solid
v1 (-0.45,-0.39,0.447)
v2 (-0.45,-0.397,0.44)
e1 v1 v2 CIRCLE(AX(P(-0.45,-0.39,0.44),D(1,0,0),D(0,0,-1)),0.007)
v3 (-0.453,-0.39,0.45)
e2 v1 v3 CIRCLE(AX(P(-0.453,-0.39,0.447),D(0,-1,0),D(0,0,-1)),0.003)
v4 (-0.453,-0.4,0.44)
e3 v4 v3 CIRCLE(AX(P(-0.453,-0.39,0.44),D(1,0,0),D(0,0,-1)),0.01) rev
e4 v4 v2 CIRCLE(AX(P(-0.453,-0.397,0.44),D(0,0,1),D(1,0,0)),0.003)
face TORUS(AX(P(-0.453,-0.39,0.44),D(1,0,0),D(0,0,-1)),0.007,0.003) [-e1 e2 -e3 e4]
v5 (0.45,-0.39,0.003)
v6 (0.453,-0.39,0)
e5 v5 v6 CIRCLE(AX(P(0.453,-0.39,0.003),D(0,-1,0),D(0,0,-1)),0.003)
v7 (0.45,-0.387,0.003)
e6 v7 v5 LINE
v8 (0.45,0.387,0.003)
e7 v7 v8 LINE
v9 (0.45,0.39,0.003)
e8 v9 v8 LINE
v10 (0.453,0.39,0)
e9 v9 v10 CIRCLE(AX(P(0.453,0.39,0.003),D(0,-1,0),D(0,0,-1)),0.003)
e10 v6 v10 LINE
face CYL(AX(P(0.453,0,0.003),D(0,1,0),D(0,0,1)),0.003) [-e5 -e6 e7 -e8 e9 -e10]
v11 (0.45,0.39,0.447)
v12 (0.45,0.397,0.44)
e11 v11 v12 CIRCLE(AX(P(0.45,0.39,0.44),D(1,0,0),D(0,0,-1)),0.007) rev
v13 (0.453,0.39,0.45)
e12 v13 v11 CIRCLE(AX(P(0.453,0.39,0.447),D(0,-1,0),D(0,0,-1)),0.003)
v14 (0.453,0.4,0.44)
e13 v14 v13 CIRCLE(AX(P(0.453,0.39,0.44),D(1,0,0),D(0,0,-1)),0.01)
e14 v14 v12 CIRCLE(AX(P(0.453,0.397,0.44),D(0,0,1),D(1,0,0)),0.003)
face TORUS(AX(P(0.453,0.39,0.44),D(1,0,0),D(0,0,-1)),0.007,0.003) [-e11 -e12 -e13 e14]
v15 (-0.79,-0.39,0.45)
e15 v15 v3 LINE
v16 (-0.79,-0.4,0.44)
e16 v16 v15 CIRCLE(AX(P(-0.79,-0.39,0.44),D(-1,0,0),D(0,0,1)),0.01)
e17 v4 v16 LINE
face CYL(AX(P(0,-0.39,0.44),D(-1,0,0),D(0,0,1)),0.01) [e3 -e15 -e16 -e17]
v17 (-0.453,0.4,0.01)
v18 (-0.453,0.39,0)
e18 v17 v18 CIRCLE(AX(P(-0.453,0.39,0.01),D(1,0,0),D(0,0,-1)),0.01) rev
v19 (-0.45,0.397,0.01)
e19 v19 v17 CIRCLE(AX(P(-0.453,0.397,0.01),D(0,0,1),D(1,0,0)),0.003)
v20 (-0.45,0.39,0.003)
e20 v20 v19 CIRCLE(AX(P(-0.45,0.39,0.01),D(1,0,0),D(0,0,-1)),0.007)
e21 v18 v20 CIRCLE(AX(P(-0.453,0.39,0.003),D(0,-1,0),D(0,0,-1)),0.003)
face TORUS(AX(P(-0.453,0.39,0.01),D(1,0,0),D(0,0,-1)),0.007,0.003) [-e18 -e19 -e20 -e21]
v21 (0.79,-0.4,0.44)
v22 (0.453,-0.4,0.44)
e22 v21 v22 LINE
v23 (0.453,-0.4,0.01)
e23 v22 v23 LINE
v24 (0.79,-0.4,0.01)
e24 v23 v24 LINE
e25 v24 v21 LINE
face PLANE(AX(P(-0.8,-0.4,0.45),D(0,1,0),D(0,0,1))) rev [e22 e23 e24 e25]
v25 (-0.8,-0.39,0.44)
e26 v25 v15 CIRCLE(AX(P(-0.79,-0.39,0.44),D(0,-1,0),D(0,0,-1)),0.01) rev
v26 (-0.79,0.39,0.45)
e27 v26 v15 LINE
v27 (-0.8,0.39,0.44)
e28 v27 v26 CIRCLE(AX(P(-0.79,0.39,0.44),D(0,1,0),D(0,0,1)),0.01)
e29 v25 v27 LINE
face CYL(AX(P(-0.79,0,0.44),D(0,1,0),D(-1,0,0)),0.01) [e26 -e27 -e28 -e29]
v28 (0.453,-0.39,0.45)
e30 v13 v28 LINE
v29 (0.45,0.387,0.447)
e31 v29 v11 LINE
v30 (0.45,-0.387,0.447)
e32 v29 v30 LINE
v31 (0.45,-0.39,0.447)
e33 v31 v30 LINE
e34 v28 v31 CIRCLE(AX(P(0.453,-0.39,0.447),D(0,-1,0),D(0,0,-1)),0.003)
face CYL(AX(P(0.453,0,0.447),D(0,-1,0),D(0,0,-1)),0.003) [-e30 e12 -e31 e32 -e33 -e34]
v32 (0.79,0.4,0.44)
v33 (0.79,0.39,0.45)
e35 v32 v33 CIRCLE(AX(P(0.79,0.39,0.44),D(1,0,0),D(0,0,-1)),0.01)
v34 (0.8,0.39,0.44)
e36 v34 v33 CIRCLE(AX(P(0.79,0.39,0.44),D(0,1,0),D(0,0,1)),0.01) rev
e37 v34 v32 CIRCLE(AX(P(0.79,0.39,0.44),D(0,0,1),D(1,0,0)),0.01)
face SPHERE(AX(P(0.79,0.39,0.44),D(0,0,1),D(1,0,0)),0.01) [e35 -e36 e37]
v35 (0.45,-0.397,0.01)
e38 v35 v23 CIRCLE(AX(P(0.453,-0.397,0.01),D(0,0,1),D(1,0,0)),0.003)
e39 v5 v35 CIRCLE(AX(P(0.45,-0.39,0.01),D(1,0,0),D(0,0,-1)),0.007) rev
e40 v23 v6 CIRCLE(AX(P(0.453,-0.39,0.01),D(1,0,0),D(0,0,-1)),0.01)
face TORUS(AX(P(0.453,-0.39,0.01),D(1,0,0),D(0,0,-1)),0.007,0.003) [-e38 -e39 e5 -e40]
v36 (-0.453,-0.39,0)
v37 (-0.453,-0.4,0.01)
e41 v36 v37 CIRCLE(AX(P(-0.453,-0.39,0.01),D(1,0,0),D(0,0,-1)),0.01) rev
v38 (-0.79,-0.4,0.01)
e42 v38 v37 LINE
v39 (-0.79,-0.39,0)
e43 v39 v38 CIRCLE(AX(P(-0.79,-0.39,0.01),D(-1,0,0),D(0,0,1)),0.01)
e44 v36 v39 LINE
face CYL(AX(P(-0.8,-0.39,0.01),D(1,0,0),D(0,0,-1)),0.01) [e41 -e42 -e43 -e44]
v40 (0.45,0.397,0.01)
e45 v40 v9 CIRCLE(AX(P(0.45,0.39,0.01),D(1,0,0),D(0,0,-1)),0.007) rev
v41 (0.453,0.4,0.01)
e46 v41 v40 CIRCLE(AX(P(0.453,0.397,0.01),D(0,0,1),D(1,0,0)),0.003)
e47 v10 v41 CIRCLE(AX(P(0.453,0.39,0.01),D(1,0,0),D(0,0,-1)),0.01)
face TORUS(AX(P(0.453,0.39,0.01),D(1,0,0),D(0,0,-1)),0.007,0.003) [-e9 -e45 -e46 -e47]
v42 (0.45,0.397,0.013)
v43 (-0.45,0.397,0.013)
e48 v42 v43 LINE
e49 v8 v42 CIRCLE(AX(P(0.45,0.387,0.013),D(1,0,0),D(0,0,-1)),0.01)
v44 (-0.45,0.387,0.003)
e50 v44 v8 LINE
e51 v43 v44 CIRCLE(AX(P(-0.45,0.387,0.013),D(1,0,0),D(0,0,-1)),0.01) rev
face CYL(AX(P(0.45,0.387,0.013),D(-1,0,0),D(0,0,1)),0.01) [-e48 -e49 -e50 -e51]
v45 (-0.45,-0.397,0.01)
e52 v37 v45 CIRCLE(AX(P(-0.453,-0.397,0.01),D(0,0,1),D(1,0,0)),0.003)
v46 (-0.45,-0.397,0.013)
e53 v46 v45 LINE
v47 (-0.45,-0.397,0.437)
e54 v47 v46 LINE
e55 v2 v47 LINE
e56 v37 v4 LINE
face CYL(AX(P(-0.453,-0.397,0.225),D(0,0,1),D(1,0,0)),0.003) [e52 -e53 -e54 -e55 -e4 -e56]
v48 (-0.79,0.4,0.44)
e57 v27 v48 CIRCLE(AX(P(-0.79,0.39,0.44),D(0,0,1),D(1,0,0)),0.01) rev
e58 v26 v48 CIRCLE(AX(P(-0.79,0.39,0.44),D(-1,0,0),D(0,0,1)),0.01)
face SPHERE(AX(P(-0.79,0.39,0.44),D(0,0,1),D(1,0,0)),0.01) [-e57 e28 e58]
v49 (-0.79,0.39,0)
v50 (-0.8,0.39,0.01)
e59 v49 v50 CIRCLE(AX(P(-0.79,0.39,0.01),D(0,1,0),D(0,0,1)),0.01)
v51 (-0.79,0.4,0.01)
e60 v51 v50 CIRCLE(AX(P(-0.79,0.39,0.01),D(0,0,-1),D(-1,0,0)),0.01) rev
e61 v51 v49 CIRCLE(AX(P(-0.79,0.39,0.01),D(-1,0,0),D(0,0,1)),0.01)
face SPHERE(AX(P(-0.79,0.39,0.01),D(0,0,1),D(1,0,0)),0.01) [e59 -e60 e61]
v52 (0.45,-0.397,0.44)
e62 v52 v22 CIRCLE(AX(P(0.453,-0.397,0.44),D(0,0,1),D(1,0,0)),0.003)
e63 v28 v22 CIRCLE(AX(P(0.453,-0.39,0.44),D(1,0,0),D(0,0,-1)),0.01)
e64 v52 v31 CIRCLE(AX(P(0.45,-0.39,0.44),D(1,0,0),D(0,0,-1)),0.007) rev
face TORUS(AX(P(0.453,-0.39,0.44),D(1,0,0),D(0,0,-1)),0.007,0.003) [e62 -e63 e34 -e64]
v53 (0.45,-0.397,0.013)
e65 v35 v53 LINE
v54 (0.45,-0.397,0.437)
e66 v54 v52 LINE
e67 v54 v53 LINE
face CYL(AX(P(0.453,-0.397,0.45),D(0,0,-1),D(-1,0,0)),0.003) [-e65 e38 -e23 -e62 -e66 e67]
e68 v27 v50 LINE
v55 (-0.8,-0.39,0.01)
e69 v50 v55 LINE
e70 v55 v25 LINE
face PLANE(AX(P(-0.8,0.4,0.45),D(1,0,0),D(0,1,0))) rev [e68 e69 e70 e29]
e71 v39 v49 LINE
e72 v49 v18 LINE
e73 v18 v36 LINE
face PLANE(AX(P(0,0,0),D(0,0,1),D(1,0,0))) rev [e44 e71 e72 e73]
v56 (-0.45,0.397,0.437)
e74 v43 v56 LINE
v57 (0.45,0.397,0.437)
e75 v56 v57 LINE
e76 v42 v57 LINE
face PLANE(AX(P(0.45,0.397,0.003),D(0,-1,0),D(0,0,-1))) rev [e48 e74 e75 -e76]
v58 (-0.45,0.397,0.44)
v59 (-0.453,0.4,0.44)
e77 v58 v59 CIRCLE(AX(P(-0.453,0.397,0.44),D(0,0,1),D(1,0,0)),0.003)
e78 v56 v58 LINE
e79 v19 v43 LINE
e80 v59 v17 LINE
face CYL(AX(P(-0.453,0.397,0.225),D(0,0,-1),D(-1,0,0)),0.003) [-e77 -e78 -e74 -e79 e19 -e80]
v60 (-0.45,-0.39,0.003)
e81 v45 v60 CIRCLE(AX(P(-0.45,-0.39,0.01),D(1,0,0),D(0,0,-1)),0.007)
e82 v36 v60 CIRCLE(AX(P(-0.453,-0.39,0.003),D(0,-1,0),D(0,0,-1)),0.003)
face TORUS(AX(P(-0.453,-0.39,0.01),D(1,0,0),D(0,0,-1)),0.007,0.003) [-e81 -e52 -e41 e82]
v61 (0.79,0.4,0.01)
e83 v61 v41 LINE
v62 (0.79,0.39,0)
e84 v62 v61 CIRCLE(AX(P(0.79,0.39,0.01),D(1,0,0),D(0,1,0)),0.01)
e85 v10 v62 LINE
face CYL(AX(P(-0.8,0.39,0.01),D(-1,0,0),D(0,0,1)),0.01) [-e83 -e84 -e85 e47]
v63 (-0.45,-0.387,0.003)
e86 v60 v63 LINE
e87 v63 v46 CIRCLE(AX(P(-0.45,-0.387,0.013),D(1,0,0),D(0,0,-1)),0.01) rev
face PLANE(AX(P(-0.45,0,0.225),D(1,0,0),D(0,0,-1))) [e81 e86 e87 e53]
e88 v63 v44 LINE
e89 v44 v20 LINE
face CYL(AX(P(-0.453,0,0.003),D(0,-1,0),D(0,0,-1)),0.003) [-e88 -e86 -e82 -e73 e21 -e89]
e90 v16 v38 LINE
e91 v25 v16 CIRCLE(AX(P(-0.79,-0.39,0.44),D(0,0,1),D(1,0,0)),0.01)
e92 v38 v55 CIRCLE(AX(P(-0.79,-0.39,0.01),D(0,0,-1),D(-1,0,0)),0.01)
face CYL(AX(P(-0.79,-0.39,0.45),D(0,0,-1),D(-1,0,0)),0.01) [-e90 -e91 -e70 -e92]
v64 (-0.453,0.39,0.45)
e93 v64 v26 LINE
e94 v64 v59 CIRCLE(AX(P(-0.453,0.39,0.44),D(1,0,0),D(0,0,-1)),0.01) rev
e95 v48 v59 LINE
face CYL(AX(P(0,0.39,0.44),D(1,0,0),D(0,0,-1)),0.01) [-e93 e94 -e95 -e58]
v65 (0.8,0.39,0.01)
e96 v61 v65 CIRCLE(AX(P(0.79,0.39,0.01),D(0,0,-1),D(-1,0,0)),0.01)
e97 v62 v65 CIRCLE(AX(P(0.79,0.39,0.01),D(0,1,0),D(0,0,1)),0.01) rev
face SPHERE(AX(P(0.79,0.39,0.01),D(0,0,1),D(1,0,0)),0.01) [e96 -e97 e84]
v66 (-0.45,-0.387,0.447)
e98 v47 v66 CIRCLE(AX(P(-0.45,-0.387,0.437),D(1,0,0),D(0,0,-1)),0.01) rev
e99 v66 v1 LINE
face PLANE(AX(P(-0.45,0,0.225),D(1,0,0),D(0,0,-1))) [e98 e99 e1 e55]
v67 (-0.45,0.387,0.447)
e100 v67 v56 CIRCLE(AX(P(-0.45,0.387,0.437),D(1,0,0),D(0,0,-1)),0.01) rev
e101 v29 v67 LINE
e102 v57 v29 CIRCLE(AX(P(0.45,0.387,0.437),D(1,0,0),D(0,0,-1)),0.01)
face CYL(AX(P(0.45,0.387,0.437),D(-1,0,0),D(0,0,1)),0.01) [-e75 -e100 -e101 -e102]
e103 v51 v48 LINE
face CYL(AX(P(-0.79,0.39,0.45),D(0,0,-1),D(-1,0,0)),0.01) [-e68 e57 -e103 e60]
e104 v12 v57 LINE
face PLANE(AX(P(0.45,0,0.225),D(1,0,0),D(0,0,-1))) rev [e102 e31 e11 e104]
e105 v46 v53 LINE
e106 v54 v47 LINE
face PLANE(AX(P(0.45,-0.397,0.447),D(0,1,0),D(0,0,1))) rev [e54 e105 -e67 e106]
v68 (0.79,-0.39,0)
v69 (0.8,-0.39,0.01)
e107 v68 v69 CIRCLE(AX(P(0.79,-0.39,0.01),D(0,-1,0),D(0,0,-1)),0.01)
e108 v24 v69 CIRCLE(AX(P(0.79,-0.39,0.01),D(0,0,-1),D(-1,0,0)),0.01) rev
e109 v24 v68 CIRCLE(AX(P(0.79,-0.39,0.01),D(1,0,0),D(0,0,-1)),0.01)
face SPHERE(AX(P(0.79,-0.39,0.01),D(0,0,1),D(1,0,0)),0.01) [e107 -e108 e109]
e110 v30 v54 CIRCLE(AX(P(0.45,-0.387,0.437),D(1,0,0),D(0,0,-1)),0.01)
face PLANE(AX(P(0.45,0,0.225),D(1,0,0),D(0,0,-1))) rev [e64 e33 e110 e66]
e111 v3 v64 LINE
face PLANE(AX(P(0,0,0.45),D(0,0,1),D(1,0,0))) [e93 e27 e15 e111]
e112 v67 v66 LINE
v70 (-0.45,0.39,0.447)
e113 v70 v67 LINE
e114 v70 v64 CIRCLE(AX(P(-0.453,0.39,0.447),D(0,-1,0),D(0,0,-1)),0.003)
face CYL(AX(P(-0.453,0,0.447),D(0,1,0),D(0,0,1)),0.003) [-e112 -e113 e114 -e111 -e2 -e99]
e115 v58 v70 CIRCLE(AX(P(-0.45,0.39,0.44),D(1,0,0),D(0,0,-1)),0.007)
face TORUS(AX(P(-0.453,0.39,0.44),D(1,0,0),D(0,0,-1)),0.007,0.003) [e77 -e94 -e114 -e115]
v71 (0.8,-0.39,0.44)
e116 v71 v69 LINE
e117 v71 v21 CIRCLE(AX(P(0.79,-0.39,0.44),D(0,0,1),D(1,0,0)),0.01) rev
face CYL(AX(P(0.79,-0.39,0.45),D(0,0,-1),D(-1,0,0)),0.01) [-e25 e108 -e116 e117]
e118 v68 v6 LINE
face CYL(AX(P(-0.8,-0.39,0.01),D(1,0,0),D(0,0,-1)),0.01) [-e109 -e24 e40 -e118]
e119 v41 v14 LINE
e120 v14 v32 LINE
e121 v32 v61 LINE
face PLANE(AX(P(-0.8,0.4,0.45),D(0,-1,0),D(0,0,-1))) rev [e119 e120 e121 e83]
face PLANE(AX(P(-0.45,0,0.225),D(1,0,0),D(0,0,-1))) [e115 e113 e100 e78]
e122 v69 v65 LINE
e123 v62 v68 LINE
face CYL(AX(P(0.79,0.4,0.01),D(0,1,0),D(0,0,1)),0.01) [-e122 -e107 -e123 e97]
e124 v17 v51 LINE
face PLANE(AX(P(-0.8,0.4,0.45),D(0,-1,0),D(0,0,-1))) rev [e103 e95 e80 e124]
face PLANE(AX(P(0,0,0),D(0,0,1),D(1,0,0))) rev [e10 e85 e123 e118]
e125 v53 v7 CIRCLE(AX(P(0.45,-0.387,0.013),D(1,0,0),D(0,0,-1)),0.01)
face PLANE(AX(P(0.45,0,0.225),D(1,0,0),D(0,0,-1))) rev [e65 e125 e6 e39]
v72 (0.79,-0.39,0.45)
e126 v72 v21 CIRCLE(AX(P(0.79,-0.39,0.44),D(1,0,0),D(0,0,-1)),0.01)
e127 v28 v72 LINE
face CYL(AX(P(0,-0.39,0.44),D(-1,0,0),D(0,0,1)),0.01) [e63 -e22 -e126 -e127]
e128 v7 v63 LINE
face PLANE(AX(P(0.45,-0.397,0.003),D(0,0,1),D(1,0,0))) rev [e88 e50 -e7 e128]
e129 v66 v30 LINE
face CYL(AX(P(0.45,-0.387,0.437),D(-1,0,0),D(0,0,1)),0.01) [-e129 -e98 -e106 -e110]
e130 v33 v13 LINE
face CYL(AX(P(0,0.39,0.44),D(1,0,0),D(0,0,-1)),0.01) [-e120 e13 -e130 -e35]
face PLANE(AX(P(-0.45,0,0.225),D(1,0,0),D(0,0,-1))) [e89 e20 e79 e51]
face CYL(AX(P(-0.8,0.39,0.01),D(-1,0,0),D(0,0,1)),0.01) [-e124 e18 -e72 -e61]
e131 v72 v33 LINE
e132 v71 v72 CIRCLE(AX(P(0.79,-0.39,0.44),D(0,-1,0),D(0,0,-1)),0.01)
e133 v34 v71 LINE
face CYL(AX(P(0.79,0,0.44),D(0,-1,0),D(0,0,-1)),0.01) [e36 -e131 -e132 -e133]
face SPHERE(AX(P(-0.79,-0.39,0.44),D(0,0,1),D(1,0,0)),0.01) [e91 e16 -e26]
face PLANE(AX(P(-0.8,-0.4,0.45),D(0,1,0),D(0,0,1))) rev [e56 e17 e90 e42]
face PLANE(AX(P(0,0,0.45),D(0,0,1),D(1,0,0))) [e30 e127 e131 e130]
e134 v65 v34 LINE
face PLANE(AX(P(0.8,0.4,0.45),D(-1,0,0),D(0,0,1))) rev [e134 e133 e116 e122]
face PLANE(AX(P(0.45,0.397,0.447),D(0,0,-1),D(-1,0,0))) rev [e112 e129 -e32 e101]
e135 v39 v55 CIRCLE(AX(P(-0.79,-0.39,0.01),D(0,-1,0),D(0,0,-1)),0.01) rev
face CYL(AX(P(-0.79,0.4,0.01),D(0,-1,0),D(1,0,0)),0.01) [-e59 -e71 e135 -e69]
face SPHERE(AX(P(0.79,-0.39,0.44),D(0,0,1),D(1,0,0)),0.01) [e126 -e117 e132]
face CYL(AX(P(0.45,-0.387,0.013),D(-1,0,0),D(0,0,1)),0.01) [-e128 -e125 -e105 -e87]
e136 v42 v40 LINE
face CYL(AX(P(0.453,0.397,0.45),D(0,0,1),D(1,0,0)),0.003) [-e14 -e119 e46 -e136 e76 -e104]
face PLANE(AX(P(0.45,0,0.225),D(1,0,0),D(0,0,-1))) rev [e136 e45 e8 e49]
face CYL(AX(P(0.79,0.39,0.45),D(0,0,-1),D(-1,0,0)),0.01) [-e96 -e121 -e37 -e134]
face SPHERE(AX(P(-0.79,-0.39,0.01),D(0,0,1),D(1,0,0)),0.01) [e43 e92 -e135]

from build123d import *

# Parameters (mm, degrees)
SKETCH1_W                           = 1.6
SKETCH1_H                           = 0.8
ALL_BODY_DEPTH                      = 0.45
CUT_OUT_THE_BODY_FOR_PIN_DEPTH      = 0.45
CUT_OUT_THE_BODY_FOR_PIN_DEPTH_BACK = 0.45
SKETCH2_OUTSIDE_W                   = 2.818
SKETCH2_OUTSIDE_H                   = 3.168
SKETCH2_OUTSIDE_W_2                 = 0.444
SKETCH2_OUTSIDE_H_2                 = 0.794
BODY_FILLET_R                       = 0.01
PIN_FILLET_A_R                      = 0.01
PIN_FILLET_B_R                      = 0.003


with BuildPart() as part:
    # Sketch1 → All body (new body)
    with BuildSketch(Plane.XY):
        Rectangle(SKETCH1_W, SKETCH1_H)
    extrude(amount=ALL_BODY_DEPTH)

    # Sketch2 outside → Cut out the body for pin (cut, two sides: drawn at the far end of the back side and taken through both)
    with BuildSketch(Plane(origin=(0, 0, 0), x_dir=(0, 0, -1), z_dir=(1, 0, 0)).offset(-CUT_OUT_THE_BODY_FOR_PIN_DEPTH_BACK)):
        with Locations((-0.225, 0)):
            Rectangle(SKETCH2_OUTSIDE_W, SKETCH2_OUTSIDE_H)
        with Locations((-0.225, 0)):
            Rectangle(SKETCH2_OUTSIDE_W_2, SKETCH2_OUTSIDE_H_2, mode=Mode.SUBTRACT)
    extrude(amount=CUT_OUT_THE_BODY_FOR_PIN_DEPTH + CUT_OUT_THE_BODY_FOR_PIN_DEPTH_BACK, mode=Mode.SUBTRACT)

    # Body fillet
    body_fillet_edges = [part.edges().sort_by_distance(p)[0] for p in [
        (0, 0.397, 0.003),
        (0, 0.397, 0.447),
        (0, -0.397, 0.447),
        (0, -0.397, 0.003),
    ]]
    fillet(body_fillet_edges, radius=BODY_FILLET_R)

    # Pin fillet a
    pin_fillet_a_edges = [part.edges().sort_by_distance(p)[0] for p in [
        (0.8, 0, 0.45),
        (-0.625, 0.4, 0),
        (0.625, -0.4, 0),
        (0.625, -0.4, 0.45),
        (-0.625, 0.4, 0.45),
        (0.625, 0.4, 0.45),
        (-0.8, 0, 0.45),
        (0.625, 0.4, 0),
        (0.8, 0, 0),
        (-0.625, -0.4, 0),
        (-0.8, 0, 0),
        (-0.8, 0.4, 0.225),
        (0.8, 0.4, 0.225),
        (0.8, -0.4, 0.225),
        (-0.8, -0.4, 0.225),
        (-0.625, -0.4, 0.45),
    ]]
    fillet(pin_fillet_a_edges, radius=PIN_FILLET_A_R)

    # Pin fillet b
    pin_fillet_b_edges = [part.edges().sort_by_distance(p)[0] for p in [
        (0.45, -0.4, 0.225),
        (0.45, 0, 0.45),
        (0.45, 0.4, 0.225),
        (0.45, 0, 0),
        (-0.45, 0.4, 0.225),
        (-0.45, 0, 0.45),
        (-0.45, -0.4, 0.225),
        (-0.45, 0, 0),
        (0.45, 0.397071068, 0.002928932),
        (0.45, -0.397071068, 0.002928932),
        (0.45, -0.397071068, 0.447071068),
        (0.45, 0.397071068, 0.447071068),
        (-0.45, -0.397071068, 0.447071068),
        (-0.45, 0.397071068, 0.447071068),
        (-0.45, -0.397071068, 0.002928932),
        (-0.45, 0.397071068, 0.002928932),
    ]]
    fillet(pin_fillet_b_edges, radius=PIN_FILLET_B_R - 0.0001)  # a hair under: the kernel refuses the full size


solid = part.part
